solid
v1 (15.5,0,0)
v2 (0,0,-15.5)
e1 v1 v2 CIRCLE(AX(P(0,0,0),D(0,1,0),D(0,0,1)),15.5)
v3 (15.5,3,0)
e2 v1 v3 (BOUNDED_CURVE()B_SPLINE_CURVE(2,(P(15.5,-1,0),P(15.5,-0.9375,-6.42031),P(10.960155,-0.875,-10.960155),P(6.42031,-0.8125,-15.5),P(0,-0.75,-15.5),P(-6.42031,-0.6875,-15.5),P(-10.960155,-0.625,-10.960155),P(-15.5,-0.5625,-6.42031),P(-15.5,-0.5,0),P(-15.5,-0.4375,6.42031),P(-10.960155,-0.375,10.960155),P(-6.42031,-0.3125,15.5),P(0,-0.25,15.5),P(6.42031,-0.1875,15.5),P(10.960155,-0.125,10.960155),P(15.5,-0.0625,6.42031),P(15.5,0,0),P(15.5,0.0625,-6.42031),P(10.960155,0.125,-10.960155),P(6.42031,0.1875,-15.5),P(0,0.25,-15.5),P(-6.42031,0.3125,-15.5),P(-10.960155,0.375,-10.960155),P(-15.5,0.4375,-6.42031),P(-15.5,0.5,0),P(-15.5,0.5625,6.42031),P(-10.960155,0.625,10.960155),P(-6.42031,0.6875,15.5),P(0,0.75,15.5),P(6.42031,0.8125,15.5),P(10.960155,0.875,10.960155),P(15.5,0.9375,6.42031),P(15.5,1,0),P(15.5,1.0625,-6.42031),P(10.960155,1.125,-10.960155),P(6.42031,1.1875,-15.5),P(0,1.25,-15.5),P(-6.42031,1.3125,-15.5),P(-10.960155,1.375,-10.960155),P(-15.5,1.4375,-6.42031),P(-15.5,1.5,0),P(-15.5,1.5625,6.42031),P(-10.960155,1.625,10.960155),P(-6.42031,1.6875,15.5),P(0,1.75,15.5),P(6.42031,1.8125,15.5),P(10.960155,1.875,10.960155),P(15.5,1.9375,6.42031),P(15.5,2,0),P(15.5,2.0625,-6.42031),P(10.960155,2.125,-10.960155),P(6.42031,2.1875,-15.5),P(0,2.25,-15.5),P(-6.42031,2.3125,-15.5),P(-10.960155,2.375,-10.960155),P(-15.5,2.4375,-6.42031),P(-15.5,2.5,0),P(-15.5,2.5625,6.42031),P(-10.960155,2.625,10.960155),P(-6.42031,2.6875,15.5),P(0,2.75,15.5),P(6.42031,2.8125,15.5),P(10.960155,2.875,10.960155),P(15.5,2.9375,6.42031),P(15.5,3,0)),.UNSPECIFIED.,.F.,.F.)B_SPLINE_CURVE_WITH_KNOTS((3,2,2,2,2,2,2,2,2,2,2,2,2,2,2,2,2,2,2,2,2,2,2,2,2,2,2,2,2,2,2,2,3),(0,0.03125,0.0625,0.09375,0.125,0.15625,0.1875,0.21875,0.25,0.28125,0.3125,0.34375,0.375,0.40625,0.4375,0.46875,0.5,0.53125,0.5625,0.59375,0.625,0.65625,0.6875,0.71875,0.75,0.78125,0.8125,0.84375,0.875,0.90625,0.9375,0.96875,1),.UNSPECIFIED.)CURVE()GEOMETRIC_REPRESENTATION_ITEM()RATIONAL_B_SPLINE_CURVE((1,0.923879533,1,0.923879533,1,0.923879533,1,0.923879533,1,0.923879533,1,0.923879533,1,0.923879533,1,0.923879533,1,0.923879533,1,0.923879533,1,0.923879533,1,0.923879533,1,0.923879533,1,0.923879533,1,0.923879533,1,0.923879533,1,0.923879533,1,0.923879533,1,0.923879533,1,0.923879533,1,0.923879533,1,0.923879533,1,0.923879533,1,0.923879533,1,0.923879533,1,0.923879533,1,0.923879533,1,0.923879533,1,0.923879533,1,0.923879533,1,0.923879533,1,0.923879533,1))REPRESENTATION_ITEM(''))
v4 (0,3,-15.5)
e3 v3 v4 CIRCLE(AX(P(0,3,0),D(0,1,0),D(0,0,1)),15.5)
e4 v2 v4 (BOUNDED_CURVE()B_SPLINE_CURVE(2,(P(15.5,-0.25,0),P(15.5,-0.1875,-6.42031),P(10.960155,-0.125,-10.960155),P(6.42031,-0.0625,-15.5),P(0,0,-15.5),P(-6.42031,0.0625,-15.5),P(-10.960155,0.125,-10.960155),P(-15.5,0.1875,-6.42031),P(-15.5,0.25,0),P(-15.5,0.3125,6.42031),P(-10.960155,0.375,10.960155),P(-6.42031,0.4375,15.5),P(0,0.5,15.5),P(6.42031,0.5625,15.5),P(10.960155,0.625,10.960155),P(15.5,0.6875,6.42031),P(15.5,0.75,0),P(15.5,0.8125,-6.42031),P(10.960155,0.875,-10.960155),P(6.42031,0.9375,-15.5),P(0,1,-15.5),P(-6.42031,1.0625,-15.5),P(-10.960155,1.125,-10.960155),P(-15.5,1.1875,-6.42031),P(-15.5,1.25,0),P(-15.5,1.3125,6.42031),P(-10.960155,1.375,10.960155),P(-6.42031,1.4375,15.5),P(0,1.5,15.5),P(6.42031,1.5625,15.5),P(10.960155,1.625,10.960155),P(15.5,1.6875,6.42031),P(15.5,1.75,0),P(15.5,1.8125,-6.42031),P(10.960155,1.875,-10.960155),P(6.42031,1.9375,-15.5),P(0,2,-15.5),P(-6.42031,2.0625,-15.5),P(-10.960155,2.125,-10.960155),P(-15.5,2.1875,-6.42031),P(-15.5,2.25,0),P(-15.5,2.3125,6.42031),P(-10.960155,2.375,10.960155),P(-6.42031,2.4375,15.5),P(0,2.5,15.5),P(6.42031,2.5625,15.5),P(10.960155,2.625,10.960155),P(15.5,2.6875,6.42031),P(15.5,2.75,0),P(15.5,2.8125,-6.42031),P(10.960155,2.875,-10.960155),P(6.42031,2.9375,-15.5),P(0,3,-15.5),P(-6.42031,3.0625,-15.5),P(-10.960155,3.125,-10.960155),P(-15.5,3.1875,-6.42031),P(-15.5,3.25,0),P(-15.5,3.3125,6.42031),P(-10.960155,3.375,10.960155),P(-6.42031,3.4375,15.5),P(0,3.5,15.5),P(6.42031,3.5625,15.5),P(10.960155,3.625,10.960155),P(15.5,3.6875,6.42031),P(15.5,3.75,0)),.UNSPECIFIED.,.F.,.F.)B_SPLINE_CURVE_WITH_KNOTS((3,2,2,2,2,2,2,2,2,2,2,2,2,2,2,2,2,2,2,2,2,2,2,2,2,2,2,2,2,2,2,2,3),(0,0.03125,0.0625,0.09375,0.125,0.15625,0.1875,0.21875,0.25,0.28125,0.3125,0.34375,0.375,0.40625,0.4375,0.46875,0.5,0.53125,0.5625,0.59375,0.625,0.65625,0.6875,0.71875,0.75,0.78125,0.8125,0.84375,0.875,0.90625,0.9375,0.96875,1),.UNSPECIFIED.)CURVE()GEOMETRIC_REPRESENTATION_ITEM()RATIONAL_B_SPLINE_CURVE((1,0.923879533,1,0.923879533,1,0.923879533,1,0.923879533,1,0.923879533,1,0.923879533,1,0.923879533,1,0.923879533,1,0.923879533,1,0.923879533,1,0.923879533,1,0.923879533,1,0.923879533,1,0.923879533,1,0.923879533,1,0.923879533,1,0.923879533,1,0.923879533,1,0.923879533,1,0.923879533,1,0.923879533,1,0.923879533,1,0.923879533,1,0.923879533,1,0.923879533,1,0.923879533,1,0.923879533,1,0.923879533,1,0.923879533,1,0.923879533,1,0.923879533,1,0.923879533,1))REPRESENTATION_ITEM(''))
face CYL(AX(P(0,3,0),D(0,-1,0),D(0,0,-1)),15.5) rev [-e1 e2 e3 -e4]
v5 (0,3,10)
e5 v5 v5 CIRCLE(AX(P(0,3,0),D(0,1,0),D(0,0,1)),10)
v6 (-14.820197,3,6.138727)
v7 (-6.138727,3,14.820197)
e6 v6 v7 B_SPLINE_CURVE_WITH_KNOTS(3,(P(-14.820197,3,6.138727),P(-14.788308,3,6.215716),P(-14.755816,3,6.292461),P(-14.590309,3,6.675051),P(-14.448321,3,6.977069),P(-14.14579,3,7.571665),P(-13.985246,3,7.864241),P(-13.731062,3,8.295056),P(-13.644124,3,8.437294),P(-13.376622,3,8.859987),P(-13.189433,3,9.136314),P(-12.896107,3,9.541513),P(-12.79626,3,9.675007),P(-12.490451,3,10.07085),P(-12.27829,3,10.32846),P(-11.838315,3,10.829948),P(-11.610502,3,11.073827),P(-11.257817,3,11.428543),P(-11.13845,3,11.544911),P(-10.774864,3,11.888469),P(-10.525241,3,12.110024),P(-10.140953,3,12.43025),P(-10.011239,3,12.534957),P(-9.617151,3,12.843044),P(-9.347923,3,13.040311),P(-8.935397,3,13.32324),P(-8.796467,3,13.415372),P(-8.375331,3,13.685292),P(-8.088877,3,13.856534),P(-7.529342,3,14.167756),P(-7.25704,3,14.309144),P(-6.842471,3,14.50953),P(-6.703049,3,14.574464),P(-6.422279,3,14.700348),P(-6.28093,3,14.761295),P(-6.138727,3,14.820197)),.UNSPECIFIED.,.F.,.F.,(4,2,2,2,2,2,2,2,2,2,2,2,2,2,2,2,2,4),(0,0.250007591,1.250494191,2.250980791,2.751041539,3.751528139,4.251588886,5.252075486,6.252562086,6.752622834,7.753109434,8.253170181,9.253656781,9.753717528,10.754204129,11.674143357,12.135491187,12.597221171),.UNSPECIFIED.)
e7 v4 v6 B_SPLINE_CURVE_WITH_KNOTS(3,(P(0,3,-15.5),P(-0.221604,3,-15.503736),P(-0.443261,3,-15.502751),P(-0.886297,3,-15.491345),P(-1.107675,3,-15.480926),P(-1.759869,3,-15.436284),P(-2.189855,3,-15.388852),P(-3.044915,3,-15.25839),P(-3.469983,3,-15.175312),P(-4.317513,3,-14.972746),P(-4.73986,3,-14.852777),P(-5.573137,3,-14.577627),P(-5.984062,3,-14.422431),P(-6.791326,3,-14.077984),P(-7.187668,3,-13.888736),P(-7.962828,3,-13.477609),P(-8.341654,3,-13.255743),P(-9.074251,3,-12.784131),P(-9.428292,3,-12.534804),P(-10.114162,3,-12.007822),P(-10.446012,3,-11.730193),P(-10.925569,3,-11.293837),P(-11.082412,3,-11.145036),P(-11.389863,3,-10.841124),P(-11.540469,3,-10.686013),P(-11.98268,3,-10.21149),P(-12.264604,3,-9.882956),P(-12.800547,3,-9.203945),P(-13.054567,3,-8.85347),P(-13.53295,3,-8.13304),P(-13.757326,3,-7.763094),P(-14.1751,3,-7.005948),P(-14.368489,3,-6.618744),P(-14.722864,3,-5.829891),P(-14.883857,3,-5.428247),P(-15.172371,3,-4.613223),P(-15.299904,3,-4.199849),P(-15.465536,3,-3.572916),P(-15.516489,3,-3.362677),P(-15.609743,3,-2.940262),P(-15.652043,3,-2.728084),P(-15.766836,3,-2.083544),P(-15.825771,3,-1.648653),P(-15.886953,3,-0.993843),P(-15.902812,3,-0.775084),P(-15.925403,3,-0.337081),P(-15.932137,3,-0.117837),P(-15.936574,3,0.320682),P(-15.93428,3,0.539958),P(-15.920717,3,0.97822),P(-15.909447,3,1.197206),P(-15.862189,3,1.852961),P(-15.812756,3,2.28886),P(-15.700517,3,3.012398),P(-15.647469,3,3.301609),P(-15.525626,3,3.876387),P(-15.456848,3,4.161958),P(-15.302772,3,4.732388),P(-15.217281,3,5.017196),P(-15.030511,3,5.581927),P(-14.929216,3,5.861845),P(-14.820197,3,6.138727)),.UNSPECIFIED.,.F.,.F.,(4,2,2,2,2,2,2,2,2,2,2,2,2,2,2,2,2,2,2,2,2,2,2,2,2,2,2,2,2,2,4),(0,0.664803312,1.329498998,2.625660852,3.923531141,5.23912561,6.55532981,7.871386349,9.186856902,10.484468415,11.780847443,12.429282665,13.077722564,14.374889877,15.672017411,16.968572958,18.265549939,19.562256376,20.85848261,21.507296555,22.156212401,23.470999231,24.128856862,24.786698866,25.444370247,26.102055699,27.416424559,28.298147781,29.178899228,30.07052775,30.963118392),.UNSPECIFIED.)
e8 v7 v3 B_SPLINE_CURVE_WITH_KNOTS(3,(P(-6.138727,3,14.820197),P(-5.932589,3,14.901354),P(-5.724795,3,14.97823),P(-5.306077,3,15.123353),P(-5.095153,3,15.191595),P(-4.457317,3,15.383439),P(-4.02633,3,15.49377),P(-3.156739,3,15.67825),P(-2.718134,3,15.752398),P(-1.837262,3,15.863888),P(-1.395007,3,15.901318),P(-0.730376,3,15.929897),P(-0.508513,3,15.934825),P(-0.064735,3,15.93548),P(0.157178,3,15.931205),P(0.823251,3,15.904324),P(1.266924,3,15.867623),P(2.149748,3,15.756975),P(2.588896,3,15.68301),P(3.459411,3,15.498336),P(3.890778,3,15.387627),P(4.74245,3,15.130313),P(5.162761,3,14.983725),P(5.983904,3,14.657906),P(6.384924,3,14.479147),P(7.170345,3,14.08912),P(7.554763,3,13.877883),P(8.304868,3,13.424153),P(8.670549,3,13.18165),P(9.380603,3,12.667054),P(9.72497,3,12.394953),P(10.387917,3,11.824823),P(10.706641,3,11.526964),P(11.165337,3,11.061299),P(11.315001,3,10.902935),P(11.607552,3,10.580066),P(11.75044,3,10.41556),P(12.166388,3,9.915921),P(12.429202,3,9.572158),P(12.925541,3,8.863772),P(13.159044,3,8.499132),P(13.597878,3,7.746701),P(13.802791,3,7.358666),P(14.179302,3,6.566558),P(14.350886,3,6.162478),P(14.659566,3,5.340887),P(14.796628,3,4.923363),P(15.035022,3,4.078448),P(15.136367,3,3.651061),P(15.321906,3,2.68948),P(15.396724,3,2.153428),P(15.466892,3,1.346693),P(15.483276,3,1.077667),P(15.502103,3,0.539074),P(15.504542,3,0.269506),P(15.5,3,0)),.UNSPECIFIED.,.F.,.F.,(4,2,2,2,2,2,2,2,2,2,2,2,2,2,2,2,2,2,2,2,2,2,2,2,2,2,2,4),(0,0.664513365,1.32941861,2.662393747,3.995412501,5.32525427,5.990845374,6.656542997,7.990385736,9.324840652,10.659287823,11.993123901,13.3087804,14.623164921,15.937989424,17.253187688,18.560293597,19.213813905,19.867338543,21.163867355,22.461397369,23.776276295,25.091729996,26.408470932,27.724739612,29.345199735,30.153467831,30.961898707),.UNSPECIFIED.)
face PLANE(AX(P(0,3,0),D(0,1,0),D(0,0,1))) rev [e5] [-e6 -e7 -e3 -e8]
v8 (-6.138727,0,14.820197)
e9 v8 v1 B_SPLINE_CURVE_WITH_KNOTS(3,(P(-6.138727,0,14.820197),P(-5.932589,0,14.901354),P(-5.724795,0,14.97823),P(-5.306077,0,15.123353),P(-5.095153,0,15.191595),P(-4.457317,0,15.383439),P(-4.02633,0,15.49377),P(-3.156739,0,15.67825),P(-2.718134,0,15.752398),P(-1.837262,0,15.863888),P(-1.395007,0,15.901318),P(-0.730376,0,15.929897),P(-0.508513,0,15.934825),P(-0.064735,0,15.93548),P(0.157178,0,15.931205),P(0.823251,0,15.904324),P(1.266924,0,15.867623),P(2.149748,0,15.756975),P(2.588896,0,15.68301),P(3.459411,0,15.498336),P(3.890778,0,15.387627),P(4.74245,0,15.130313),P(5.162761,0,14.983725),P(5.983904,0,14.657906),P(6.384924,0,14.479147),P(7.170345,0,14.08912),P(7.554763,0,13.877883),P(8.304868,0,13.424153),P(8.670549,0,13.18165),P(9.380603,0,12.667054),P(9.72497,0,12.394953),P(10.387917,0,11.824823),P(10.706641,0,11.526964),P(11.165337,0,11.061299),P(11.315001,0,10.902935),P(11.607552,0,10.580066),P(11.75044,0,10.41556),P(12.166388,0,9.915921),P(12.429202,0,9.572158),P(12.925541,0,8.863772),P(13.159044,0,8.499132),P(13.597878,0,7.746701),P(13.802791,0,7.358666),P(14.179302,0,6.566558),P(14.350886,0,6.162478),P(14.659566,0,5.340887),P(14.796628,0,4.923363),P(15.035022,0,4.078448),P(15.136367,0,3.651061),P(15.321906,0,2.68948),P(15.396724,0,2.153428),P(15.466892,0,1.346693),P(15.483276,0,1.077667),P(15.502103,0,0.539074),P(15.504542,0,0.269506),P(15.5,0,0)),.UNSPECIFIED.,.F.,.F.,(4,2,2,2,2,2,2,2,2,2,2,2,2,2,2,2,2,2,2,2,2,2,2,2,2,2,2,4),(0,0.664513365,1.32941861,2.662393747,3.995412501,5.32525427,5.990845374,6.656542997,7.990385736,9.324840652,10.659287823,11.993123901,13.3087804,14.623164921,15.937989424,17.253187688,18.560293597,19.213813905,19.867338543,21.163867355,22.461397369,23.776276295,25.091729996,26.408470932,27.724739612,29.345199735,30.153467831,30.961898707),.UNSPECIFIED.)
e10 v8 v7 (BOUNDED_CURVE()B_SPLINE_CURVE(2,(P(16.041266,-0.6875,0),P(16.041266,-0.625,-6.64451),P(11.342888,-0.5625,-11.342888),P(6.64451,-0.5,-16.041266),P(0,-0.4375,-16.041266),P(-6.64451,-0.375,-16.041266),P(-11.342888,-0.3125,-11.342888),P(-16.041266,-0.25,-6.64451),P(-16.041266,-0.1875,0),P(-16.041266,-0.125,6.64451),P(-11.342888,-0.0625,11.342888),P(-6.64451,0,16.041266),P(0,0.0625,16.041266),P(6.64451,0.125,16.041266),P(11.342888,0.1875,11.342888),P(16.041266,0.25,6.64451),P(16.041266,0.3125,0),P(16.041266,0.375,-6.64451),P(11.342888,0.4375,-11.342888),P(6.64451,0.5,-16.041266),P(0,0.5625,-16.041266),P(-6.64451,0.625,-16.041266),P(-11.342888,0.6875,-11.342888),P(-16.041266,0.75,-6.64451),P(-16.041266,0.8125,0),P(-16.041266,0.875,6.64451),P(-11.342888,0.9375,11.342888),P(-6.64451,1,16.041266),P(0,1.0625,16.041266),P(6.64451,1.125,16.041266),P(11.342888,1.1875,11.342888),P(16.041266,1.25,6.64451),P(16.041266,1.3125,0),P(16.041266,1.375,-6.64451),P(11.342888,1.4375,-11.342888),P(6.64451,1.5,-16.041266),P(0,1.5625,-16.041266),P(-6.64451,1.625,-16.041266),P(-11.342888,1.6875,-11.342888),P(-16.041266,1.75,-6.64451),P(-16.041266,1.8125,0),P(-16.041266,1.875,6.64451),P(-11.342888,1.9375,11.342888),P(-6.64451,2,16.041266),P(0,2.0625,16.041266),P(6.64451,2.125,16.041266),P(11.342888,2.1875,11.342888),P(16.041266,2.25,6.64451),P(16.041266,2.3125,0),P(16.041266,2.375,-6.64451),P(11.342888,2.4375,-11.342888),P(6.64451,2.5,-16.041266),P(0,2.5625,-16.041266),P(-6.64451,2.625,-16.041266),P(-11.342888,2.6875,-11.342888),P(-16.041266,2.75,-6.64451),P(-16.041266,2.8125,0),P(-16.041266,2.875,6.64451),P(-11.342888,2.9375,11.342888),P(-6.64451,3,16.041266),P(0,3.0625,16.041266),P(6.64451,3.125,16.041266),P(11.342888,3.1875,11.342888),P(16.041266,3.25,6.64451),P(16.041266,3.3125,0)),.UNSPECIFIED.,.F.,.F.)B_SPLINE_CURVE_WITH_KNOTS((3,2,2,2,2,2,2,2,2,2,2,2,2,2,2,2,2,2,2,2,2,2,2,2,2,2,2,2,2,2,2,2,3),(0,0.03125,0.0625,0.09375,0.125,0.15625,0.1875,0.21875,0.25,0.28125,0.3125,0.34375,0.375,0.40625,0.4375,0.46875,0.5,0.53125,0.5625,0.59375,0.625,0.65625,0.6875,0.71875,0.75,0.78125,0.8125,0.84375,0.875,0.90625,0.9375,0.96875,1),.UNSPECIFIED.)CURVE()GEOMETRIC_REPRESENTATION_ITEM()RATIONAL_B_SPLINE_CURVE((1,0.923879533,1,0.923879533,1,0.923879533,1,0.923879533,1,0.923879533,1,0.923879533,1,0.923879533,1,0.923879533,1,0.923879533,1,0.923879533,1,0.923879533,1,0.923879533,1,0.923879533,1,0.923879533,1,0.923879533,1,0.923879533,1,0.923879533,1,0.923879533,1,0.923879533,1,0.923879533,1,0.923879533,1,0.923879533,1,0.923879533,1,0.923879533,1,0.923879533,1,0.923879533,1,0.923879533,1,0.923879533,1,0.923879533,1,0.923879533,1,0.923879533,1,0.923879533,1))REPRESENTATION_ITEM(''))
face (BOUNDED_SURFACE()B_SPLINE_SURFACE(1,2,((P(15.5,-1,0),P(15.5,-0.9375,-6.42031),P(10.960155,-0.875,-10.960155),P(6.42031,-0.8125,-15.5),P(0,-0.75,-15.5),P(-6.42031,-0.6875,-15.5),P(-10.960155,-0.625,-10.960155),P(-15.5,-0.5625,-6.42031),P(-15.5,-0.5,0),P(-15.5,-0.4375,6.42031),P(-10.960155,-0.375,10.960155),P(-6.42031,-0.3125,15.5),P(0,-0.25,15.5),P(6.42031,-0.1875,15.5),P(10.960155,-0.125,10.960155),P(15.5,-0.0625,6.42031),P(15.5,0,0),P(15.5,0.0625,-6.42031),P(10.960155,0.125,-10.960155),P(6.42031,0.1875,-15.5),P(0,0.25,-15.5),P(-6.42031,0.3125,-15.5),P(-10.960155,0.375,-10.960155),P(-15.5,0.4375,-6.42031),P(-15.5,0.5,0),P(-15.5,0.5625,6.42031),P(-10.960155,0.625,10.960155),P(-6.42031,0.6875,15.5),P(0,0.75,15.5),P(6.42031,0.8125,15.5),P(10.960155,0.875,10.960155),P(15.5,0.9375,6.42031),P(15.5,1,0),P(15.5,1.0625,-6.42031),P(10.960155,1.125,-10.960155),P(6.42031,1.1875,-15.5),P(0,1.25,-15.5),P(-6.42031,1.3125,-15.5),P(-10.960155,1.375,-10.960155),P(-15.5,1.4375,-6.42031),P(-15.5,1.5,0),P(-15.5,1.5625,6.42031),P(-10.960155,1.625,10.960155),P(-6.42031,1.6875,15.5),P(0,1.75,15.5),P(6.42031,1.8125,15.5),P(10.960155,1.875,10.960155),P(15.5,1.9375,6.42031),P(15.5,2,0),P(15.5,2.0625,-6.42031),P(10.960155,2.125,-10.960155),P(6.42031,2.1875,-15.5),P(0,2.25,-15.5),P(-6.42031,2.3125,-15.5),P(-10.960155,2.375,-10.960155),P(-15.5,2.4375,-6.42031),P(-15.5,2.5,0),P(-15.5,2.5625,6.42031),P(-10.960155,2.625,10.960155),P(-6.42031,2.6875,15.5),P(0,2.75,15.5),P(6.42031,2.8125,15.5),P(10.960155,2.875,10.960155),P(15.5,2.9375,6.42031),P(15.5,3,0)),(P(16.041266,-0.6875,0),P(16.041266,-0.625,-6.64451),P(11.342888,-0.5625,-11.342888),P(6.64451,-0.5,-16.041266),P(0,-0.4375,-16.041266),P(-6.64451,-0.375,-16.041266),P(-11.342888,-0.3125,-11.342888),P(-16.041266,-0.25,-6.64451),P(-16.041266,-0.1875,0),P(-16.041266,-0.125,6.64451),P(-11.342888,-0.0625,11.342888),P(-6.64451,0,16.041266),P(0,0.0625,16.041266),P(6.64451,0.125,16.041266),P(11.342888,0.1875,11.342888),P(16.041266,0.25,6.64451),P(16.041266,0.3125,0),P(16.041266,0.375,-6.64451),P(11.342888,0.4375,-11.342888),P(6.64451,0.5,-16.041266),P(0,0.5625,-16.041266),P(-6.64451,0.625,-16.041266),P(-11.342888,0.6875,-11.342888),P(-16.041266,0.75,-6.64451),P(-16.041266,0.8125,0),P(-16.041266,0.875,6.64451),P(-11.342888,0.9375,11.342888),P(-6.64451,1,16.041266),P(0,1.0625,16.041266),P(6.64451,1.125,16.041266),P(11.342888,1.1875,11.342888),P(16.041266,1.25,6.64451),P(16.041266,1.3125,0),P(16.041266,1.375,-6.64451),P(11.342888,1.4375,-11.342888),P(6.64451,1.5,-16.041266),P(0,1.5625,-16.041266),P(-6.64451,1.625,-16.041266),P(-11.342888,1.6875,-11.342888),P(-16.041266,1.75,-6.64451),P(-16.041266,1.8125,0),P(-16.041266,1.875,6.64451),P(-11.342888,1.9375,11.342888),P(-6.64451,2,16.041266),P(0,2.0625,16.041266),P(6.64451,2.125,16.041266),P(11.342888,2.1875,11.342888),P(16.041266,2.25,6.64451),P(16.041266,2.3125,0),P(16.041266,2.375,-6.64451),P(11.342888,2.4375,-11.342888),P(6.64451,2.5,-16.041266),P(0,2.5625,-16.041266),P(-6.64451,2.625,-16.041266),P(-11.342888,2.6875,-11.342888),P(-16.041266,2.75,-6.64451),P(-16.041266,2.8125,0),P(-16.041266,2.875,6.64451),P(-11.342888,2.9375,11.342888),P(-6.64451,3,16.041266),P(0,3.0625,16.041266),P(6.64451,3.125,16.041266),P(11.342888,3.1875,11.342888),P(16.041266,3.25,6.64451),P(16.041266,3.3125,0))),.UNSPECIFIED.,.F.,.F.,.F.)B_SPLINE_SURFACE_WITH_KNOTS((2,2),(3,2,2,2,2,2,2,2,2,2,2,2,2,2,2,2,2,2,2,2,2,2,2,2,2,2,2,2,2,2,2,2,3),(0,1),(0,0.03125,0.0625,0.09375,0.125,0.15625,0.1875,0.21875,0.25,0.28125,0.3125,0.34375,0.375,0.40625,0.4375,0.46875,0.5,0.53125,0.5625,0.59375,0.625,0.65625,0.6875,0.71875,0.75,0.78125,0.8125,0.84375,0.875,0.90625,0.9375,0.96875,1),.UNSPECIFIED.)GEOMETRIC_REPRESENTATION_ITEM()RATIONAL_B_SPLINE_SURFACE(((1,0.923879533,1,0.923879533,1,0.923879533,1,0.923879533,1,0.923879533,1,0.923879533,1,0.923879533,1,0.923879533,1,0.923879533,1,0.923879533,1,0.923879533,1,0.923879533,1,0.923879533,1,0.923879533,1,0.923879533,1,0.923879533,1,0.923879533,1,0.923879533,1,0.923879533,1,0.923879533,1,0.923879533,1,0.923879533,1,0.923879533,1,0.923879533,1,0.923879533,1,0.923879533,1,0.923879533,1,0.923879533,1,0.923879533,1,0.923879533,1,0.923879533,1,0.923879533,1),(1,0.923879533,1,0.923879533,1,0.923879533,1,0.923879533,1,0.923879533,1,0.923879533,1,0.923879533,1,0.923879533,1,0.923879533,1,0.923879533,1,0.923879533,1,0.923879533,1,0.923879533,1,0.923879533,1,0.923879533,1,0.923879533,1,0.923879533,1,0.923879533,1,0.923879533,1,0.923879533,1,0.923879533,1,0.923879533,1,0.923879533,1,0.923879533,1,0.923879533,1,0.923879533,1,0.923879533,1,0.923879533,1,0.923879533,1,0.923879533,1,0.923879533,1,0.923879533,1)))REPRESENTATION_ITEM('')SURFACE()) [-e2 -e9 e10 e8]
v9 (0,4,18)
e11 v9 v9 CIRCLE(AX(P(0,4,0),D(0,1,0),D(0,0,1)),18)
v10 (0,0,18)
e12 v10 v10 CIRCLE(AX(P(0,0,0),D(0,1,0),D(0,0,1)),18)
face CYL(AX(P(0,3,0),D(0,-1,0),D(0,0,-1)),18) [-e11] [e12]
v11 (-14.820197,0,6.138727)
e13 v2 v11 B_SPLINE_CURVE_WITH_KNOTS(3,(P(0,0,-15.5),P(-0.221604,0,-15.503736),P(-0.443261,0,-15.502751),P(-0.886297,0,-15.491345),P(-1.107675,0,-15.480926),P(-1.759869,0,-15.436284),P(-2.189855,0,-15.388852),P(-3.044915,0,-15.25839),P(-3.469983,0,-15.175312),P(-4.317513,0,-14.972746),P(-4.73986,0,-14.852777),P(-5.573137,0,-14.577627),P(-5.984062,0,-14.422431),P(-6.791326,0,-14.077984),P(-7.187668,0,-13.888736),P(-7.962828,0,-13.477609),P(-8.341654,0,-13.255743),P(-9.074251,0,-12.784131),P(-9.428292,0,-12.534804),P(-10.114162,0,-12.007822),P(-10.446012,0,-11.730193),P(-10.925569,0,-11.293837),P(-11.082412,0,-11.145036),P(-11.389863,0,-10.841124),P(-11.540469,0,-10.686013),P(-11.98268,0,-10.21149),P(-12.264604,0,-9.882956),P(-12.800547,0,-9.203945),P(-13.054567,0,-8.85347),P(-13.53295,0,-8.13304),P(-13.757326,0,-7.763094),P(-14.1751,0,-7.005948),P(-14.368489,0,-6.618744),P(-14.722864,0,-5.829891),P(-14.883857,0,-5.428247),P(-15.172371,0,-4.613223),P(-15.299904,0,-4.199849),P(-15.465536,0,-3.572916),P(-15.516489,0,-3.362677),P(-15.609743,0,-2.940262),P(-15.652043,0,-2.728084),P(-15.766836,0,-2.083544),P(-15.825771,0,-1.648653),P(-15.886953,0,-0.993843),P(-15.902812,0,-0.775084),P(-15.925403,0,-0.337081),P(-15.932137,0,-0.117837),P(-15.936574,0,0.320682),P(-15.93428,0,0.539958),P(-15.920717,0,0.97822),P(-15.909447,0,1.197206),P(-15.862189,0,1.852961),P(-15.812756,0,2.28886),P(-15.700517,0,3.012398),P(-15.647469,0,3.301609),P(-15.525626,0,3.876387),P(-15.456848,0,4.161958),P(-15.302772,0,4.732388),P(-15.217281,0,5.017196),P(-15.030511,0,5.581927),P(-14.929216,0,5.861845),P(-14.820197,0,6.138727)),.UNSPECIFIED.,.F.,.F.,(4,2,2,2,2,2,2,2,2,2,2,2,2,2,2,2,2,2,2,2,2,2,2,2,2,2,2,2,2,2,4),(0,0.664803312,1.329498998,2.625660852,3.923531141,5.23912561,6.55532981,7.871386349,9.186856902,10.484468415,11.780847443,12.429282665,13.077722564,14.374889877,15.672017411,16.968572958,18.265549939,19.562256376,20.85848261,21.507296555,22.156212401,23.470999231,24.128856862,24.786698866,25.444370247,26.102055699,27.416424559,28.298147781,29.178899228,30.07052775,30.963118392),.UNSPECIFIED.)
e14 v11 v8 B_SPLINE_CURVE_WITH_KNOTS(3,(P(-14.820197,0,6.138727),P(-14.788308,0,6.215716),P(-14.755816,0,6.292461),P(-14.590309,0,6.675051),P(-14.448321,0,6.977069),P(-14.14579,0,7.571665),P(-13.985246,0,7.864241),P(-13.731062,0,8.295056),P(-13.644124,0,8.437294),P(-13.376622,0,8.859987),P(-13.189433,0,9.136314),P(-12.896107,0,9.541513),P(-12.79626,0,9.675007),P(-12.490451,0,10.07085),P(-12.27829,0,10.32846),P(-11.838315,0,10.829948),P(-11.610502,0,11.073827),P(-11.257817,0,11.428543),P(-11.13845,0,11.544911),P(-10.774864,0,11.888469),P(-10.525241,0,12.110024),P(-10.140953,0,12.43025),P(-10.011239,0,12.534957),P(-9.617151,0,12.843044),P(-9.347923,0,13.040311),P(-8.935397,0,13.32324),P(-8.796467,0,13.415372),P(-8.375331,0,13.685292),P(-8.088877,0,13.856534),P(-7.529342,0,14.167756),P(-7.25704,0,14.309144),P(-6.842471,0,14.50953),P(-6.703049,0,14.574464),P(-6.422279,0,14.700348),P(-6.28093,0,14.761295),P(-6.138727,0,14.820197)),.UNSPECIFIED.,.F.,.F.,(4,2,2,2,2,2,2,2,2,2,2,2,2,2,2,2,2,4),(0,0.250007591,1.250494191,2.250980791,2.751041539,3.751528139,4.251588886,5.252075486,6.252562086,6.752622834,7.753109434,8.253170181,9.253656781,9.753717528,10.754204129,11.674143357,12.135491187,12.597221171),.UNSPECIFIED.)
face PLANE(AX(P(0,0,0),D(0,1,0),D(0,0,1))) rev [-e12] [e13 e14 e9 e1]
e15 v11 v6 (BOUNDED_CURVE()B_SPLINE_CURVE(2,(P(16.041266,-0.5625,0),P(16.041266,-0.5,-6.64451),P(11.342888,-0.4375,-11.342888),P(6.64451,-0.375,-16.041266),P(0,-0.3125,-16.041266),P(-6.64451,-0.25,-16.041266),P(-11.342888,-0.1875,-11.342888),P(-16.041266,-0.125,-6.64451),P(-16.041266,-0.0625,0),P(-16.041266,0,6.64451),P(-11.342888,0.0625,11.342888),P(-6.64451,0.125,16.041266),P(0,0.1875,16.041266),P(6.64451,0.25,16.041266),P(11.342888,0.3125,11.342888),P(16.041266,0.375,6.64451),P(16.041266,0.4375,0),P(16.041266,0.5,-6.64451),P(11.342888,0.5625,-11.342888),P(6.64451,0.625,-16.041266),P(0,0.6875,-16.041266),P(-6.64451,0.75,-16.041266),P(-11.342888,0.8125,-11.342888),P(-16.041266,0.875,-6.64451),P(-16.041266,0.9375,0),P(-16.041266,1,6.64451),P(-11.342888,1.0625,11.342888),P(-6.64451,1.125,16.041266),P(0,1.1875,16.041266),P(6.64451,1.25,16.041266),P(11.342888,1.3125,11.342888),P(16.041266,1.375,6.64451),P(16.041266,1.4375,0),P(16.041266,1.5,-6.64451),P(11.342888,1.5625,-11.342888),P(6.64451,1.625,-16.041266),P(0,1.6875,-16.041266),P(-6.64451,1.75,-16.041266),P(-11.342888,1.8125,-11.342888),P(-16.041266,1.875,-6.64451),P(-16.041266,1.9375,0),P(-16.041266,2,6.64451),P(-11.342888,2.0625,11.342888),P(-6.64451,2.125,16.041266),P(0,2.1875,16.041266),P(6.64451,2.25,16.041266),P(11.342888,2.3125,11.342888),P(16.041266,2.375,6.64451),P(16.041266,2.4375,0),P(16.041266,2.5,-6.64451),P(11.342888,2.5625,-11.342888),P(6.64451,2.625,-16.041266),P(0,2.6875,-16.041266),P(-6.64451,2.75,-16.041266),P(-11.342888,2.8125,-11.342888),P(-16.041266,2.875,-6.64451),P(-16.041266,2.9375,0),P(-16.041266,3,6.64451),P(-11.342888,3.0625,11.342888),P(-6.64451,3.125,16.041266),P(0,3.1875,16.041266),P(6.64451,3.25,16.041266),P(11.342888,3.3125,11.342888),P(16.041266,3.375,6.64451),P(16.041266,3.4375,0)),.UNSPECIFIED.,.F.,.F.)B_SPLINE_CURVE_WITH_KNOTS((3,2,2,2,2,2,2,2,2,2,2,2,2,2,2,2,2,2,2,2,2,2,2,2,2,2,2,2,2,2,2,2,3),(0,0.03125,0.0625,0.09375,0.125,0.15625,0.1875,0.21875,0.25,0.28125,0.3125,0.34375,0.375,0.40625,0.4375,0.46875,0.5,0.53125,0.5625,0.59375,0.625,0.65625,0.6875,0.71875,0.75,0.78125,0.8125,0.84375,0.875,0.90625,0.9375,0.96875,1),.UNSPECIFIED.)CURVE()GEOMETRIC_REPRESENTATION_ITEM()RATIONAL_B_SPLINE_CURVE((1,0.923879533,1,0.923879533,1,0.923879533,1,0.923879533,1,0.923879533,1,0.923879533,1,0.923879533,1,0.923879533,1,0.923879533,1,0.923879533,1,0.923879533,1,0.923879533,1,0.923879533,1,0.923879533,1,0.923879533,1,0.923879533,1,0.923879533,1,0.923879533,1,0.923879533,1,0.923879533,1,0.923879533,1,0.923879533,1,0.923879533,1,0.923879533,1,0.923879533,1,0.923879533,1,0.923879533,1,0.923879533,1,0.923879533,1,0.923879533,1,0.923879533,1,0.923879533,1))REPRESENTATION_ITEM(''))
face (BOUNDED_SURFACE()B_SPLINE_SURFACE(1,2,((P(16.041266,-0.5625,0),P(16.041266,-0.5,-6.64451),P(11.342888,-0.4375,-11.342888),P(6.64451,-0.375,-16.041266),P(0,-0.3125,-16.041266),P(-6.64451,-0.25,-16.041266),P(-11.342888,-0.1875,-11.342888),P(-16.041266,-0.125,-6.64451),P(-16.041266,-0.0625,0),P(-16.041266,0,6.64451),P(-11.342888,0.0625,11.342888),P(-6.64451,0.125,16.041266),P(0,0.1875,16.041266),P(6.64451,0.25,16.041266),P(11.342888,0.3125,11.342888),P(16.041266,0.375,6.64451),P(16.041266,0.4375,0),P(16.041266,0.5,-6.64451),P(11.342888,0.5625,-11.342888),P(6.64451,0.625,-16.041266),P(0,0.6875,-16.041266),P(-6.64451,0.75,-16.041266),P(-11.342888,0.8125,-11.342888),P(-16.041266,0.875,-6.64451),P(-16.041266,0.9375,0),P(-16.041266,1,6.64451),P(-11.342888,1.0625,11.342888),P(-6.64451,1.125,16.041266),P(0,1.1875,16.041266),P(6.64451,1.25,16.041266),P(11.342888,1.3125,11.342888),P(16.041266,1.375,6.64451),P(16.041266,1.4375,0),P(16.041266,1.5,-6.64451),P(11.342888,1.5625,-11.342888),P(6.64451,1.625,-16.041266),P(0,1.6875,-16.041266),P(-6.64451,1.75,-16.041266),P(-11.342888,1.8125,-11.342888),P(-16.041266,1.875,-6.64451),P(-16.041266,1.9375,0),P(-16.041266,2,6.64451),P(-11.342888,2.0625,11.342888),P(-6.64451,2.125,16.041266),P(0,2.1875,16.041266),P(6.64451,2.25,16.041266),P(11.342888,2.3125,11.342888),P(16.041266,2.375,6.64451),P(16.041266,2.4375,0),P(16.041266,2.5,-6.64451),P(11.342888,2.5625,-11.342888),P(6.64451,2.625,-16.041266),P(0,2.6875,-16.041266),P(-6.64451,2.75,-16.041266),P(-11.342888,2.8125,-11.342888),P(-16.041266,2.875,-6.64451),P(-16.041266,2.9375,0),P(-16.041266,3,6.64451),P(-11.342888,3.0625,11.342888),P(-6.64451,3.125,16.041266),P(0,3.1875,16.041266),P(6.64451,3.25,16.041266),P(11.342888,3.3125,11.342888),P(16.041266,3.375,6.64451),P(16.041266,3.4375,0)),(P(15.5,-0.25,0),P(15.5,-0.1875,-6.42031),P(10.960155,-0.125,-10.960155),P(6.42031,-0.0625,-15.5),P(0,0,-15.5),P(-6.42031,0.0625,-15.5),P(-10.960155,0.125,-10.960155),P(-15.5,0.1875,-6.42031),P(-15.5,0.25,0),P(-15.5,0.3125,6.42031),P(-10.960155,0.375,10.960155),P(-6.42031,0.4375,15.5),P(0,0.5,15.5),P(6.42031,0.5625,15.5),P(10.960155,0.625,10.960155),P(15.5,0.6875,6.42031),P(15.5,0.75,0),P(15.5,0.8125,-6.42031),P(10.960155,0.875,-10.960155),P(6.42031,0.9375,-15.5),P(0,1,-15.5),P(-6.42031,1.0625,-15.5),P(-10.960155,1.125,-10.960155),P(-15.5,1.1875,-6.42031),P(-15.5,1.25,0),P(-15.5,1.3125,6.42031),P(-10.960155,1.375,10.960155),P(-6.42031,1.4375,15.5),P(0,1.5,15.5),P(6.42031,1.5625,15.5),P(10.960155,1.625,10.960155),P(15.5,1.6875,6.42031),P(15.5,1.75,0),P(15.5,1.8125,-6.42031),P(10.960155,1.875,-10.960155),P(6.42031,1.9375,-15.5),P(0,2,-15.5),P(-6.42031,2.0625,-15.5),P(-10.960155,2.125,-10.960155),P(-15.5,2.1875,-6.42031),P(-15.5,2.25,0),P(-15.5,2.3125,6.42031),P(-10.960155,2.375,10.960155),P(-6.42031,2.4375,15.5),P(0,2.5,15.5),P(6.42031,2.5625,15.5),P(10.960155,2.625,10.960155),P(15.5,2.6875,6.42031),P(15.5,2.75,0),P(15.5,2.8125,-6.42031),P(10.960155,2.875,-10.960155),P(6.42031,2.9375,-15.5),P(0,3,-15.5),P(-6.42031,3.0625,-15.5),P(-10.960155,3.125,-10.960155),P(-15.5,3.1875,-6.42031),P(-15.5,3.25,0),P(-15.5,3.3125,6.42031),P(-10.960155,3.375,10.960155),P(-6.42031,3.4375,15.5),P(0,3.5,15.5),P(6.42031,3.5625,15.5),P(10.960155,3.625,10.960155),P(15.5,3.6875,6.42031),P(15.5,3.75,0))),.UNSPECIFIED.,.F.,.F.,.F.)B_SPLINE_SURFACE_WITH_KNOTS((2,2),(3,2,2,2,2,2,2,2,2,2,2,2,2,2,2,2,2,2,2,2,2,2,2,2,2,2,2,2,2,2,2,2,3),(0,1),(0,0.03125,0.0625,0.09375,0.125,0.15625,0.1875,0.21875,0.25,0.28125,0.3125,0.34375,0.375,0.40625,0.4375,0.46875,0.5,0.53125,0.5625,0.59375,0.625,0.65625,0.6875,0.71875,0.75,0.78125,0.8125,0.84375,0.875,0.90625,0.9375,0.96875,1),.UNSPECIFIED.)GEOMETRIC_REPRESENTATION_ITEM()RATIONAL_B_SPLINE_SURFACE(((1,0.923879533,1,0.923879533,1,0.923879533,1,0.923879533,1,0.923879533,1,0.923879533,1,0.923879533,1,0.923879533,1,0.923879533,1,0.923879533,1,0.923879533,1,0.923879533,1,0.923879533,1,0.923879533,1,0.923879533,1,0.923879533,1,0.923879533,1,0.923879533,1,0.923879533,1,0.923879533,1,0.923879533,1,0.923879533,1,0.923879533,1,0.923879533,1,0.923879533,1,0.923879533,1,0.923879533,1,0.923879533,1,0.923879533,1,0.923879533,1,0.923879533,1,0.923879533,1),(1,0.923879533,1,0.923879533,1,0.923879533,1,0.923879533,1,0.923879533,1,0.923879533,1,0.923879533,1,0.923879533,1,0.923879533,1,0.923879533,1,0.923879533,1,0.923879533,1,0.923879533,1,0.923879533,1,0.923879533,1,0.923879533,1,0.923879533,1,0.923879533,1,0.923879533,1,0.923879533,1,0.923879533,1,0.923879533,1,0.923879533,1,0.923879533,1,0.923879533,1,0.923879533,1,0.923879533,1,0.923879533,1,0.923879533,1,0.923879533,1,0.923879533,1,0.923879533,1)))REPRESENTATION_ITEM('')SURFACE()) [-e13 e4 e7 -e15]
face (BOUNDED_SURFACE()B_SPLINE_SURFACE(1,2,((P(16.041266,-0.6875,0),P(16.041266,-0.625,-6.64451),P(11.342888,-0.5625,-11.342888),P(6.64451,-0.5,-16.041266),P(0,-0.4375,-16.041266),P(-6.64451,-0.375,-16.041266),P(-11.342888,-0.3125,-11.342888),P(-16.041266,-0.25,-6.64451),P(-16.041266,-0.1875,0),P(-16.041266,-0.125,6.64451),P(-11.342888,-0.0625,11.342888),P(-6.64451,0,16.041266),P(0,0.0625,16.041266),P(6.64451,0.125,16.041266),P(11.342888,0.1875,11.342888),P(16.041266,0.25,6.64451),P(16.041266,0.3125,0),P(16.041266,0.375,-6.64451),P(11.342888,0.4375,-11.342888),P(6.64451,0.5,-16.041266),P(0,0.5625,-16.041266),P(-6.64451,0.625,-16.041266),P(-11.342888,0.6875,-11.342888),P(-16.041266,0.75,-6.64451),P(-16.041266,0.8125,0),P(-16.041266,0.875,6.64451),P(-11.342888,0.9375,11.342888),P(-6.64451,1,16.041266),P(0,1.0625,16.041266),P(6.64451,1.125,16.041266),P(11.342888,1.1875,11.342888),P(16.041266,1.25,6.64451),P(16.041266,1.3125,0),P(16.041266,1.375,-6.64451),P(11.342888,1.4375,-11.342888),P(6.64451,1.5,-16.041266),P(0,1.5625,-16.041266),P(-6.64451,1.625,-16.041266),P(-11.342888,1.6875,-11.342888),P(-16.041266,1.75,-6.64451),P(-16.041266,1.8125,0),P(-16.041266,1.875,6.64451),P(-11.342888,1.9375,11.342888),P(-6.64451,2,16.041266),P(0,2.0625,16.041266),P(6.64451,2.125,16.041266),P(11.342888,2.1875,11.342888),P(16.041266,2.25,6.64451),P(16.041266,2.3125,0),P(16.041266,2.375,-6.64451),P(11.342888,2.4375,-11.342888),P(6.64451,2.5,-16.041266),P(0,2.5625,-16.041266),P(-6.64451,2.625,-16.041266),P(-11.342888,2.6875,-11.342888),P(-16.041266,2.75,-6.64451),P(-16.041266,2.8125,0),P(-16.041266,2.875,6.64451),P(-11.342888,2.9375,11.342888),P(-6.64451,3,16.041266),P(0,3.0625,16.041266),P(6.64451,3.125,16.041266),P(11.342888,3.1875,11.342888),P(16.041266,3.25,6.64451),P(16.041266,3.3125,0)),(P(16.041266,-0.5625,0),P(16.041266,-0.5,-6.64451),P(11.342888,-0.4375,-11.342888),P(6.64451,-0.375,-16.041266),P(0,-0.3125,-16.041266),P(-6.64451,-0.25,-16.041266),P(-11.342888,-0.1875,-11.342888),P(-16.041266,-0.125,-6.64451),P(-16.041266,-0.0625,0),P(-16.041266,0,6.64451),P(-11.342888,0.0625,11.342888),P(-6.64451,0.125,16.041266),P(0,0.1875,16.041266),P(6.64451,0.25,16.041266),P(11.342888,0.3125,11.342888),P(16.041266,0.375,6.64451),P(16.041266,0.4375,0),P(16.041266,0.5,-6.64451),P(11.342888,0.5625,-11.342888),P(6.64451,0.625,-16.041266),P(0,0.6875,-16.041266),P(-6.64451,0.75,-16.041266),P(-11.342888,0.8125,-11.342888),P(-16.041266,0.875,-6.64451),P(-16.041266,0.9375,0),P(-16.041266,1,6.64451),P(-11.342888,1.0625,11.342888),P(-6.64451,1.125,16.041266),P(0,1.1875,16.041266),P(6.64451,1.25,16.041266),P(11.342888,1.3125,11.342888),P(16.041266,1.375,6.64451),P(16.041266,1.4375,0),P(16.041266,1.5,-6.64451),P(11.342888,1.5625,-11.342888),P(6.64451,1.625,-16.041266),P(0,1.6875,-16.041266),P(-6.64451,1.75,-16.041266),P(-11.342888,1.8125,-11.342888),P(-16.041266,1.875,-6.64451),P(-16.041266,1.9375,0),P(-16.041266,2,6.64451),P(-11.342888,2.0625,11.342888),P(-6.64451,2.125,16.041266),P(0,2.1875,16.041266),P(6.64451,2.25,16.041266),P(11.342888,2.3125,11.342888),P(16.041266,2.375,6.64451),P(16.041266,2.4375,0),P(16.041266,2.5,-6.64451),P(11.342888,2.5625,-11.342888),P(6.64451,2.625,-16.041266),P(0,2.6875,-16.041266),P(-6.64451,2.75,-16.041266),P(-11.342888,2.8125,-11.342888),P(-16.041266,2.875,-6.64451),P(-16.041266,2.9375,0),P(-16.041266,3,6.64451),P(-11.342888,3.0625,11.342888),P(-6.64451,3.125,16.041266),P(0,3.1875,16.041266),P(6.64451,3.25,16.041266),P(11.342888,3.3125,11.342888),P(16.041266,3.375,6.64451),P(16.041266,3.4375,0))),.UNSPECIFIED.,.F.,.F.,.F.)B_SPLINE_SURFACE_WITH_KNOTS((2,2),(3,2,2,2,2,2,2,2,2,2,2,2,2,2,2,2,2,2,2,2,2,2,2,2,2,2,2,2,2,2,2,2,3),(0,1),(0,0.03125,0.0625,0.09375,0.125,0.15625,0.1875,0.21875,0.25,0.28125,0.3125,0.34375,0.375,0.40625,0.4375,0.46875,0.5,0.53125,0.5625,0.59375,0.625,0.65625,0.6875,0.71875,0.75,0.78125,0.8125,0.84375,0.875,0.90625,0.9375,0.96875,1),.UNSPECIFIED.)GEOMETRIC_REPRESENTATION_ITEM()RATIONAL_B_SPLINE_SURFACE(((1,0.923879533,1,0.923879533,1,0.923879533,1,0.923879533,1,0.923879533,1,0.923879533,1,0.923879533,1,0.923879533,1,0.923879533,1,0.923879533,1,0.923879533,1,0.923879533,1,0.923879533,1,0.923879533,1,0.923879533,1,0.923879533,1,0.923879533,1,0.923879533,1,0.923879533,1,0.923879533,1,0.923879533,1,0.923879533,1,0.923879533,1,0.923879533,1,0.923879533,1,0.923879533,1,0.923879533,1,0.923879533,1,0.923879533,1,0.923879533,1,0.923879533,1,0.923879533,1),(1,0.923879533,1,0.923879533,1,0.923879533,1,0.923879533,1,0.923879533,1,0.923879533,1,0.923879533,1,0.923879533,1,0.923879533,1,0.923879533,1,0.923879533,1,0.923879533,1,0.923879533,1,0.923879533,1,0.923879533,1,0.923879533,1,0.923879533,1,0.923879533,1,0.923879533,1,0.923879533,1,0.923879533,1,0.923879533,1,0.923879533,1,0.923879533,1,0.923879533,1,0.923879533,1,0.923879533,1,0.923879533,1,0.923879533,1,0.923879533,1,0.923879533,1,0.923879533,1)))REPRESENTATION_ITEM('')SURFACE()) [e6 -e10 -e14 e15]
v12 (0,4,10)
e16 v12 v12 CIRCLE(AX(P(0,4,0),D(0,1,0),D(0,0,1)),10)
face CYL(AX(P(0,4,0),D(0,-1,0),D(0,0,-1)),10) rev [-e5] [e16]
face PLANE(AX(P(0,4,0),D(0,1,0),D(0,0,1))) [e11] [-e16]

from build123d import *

# Parameters (mm, degrees)
SKETCH1_R           = 18
SKETCH1_R_2         = 15.5
BOSS_EXTRUDE1_DEPTH = 3
SKETCH2_R           = 18
SKETCH2_R_2         = 10
BOSS_EXTRUDE2_DEPTH = 1
THREAD2_PITCH       = 1
THREAD2_TO          = 4


with BuildPart() as part:
    # Sketch1 → Boss-Extrude1 (new body)
    with BuildSketch(Plane(origin=(0, 0, 0), x_dir=(1, 0, 0), z_dir=(0, 1, 0))):
        with Locations(Location((0, 0, 0), (0, 0, 270))):
            Circle(SKETCH1_R)
        with Locations(Location((0, 0, 0), (0, 0, 270))):
            Circle(SKETCH1_R_2, mode=Mode.SUBTRACT)
    extrude(amount=BOSS_EXTRUDE1_DEPTH)

    # Sketch2 → Boss-Extrude2 (add)
    with BuildSketch(Plane(origin=(0, 3, 0), x_dir=(1, 0, 0), z_dir=(0, 1, 0))):
        with Locations(Location((0, 0, 0), (0, 0, 270))):
            Circle(SKETCH2_R)
        with Locations(Location((0, 0, 0), (0, 0, 270))):
            Circle(SKETCH2_R_2, mode=Mode.SUBTRACT)
    extrude(amount=BOSS_EXTRUDE2_DEPTH)

    # Thread2: arcs per turn and ends read off the stored shape
    # Thread2: the profile of Thread Profile2 profile screwed along a right-hand helix through 4 turns, 8 arcs to a turn; built about Z, then put on its axis
    thread2_z = Axis((0, 0, 0), (0, 0, 1))
    thread2_corners = [(15.4997, 0, -0.000173205), (16.041265875, 0, 0.312499999), (16.041265875, 0, 0.437499999), (15.4997, 0, 0.750173202)]
    with BuildLine(mode=Mode.PRIVATE) as thread2_profile:
        Line(thread2_corners[0], thread2_corners[1])
        Line(thread2_corners[1], thread2_corners[2])
        Line(thread2_corners[2], thread2_corners[3])
        Line(thread2_corners[3], thread2_corners[0])
    thread2_cap = Face(thread2_profile.wire())
    thread2_turn_angles = [0, 22.5, 45, 67.5, 90, 112.5, 135, 157.5, 180, 202.5, 225, 247.5, 270, 292.5, 315, 337.5, 360]
    thread2_turn_weights = [1, 0.9238795325112867, 1, 0.9238795325112867, 1, 0.9238795325112867, 1, 0.9238795325112867, 1, 0.9238795325112867, 1, 0.9238795325112867, 1, 0.9238795325112867, 1, 0.9238795325112867, 1]
    thread2_turn_rails = [Edge.make_bspline([Vector(p[0], p[1], 0).rotate(thread2_z, thread2_turn_angles[k]) / thread2_turn_weights[k] + Vector(0, 0, p[2] + THREAD2_PITCH * thread2_turn_angles[k] / 360) for k in range(17)], [0, 0, 0, 1, 1, 2, 2, 3, 3, 4, 4, 5, 5, 6, 6, 7, 7, 8, 8, 8], 2, thread2_turn_weights) for p in thread2_corners]
    thread2_turn_sides = [Face.make_surface_from_curves(thread2_turn_rails[p[0]], thread2_turn_rails[p[1]]) for p in [(0, 1), (1, 2), (2, 3), (3, 0)]]
    thread2 = Plane(origin=(0, -1, 0), x_dir=(1, 0, 0), z_dir=(0, 1, 0)) * split(Solid(Shell([*[p.moved(Location((0, 0, THREAD2_PITCH * i))) for i in range(4) for p in thread2_turn_sides], thread2_cap, thread2_cap.rotate(thread2_z, 1440).moved(Location((0, 0, THREAD2_PITCH * 1440 / 360)))])), bisect_by=Plane.XY.offset(THREAD2_TO), keep=Keep.BOTTOM, mode=Mode.PRIVATE)
    add(thread2, mode=Mode.SUBTRACT)


solid = part.part
